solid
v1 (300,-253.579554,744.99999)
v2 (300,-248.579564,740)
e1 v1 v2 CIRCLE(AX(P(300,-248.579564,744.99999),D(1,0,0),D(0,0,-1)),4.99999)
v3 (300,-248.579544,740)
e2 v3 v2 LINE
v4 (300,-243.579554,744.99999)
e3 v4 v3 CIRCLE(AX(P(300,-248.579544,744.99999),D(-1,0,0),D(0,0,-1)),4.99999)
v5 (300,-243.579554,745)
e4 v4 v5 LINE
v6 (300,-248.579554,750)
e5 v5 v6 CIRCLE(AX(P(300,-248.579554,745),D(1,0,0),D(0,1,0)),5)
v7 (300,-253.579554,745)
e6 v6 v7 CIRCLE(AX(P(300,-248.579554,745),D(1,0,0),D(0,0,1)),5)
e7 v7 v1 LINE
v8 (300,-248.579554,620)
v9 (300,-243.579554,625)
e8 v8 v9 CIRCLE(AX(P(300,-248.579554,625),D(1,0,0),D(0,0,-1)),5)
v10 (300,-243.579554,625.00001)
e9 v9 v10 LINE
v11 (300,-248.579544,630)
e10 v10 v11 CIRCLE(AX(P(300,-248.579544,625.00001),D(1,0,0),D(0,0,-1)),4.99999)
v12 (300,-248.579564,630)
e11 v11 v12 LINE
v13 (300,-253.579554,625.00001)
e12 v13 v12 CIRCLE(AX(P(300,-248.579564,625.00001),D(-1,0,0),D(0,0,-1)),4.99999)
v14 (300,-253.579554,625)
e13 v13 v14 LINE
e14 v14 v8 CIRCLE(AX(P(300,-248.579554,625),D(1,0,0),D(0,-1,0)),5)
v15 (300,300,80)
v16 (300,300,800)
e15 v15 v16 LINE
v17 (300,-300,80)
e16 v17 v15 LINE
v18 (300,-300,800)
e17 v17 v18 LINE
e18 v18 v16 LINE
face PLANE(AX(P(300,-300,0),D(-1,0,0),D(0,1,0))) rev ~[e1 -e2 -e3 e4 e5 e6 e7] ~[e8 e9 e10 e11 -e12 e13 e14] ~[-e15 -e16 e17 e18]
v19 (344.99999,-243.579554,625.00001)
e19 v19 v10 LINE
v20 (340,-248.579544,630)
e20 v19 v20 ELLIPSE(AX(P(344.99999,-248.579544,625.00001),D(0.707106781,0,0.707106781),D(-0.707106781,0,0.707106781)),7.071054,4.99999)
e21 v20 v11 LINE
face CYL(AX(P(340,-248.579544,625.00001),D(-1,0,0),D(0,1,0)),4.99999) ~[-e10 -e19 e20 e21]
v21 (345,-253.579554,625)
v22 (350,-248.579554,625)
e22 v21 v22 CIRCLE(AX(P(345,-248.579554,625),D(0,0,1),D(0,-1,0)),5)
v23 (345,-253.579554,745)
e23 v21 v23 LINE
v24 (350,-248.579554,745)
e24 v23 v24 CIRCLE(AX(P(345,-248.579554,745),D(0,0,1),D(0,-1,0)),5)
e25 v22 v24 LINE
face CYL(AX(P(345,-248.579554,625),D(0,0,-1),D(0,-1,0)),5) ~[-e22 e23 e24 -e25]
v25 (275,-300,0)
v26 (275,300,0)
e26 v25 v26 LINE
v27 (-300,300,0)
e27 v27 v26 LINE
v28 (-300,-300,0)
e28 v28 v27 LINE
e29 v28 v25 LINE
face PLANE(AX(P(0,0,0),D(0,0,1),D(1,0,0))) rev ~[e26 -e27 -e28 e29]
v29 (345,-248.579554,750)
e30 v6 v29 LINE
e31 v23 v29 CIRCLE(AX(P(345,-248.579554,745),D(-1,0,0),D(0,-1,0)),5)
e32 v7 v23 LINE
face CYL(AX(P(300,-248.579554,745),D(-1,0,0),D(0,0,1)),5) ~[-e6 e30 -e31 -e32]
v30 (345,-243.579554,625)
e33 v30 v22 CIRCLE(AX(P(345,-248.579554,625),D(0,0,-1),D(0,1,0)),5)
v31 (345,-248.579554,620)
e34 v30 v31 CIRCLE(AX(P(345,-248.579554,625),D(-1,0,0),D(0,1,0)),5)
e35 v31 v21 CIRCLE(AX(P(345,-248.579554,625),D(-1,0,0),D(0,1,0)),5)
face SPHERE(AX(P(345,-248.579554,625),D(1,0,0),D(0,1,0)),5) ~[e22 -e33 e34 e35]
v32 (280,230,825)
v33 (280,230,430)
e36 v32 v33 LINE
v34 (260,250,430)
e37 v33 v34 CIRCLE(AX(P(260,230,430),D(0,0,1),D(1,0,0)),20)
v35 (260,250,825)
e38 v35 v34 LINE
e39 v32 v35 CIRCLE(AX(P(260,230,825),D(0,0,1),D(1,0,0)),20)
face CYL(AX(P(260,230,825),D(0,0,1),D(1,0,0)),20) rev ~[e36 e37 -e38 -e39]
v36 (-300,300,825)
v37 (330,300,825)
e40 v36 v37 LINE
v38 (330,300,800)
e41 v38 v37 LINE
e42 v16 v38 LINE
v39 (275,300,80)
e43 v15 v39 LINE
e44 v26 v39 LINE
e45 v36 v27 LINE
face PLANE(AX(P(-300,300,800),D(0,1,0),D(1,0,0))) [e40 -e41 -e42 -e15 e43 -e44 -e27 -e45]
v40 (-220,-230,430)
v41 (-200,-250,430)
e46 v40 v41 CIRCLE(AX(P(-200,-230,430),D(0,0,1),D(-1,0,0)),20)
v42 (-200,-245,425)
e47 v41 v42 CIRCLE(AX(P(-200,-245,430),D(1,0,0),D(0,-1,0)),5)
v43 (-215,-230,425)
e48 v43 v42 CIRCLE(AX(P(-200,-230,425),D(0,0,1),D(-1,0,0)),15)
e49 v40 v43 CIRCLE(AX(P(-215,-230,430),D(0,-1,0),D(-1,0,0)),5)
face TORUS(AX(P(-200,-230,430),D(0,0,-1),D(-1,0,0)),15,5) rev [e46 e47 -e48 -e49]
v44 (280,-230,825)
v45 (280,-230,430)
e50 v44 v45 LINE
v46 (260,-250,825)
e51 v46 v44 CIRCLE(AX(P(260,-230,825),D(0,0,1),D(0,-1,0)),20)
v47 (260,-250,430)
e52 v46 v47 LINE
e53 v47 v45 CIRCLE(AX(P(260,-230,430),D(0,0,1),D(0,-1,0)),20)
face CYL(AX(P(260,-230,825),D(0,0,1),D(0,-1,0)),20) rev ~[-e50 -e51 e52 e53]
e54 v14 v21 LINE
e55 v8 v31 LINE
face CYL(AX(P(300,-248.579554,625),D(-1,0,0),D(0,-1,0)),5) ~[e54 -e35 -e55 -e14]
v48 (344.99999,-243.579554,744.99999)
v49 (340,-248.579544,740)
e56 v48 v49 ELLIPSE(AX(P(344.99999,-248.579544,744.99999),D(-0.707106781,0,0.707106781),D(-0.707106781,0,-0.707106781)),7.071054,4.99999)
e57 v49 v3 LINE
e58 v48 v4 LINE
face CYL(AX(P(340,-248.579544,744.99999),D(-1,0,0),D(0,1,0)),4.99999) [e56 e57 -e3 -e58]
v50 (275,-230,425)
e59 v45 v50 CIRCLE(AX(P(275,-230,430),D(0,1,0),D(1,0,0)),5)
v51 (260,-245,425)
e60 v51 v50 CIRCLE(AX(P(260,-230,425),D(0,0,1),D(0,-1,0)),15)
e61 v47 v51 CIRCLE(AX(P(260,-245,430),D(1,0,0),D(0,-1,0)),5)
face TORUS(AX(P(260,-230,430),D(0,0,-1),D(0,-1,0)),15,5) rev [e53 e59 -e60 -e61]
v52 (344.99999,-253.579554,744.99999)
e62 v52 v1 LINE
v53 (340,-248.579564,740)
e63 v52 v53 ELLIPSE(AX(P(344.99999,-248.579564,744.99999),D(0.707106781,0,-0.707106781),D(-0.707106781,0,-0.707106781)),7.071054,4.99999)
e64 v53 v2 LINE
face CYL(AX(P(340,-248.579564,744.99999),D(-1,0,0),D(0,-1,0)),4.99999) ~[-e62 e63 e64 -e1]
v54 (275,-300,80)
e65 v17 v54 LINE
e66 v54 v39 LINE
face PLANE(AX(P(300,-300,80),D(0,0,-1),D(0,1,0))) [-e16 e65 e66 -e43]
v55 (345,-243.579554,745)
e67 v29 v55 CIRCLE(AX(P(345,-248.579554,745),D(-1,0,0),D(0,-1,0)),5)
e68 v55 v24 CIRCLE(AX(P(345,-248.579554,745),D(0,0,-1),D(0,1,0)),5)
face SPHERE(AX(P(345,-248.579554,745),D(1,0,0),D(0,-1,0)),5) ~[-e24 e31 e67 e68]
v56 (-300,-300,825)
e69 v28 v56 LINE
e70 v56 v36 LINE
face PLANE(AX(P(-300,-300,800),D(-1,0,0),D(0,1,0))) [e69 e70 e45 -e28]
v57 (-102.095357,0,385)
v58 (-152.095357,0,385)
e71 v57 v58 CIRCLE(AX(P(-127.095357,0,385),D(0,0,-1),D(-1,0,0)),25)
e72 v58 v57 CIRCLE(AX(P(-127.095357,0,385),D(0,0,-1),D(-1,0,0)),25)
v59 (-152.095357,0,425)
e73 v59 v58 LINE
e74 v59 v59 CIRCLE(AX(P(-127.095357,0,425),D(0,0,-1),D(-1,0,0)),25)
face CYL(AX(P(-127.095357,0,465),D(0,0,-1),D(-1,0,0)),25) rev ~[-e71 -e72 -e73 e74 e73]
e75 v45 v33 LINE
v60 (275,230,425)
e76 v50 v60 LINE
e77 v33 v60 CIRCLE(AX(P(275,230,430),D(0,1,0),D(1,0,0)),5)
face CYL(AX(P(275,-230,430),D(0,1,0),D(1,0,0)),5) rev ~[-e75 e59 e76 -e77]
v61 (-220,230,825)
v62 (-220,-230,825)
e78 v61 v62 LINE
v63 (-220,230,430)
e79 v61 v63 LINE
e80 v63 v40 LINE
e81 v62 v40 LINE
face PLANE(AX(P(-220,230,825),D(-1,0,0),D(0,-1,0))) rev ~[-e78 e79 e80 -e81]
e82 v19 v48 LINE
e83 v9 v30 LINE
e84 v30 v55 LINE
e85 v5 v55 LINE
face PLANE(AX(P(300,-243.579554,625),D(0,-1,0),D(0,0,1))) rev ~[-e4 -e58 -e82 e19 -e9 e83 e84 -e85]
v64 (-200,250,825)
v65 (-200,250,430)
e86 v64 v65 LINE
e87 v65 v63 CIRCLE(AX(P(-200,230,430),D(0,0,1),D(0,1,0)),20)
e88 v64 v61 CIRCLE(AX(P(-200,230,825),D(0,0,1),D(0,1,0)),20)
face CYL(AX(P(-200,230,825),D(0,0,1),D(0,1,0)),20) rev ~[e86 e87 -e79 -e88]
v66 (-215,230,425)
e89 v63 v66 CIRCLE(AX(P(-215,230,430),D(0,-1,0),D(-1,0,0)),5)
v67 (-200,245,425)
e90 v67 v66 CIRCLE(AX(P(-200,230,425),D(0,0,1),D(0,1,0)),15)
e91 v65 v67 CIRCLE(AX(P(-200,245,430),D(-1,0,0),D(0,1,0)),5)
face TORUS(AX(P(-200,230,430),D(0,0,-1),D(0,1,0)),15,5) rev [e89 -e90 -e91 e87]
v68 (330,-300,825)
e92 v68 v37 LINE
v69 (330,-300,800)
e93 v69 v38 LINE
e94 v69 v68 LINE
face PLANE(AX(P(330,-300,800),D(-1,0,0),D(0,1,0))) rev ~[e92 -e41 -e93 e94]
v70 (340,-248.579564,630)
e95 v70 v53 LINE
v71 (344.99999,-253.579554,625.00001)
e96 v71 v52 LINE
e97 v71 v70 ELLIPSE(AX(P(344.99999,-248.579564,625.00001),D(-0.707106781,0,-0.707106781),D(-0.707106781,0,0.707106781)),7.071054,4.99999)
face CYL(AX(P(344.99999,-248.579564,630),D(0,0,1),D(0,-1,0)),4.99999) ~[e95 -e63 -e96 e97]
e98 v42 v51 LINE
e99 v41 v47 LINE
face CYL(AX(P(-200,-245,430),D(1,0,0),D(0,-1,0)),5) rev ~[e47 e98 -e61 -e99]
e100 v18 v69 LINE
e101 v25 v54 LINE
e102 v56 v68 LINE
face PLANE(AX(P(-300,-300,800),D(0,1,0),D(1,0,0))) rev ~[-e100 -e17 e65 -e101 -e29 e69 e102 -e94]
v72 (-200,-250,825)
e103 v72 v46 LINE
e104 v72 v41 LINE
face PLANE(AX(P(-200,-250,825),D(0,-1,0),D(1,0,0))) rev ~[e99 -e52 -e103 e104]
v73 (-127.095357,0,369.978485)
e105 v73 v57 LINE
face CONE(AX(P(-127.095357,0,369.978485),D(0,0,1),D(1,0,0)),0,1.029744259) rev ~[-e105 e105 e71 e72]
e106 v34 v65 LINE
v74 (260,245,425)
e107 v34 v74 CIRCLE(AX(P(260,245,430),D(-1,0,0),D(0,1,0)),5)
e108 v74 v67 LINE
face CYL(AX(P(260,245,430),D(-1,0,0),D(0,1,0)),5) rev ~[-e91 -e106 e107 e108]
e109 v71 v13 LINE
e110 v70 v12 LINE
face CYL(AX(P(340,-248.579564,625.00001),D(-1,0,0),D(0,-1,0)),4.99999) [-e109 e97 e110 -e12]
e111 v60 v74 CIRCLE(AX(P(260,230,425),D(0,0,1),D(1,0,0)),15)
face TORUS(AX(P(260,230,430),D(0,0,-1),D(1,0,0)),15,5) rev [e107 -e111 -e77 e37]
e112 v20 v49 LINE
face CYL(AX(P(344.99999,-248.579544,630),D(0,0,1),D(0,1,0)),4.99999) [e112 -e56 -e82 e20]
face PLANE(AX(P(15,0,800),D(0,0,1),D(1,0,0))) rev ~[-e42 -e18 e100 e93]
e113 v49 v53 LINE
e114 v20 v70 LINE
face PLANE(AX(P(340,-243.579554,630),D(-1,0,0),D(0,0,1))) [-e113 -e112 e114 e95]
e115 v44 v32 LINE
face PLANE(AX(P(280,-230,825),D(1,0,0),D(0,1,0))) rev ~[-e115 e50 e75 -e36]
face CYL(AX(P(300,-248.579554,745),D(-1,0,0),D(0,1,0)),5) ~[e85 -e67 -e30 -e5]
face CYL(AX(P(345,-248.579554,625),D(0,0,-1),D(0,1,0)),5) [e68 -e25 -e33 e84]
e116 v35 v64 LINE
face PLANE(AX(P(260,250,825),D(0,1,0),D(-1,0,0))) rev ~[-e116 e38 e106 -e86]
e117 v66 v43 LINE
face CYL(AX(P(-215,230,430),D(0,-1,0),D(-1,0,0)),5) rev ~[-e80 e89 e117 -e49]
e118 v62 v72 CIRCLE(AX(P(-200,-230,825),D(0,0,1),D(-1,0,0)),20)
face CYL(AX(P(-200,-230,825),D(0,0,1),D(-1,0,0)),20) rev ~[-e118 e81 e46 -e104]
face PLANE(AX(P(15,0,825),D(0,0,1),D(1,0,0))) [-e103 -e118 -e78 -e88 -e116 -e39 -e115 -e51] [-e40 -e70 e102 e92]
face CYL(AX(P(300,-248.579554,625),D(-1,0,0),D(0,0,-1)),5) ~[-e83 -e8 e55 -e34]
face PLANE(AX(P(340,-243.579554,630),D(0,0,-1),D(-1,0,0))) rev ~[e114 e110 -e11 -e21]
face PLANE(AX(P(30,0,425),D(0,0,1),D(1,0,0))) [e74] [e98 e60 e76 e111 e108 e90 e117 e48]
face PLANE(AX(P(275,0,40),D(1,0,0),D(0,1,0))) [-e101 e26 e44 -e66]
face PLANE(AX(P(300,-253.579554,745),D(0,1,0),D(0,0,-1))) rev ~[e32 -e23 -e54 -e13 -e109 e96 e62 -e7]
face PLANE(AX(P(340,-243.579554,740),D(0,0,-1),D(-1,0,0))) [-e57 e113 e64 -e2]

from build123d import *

# Parameters (mm, degrees)
F0_W        = 600
F0_H        = 600
F1_DEPTH    = 800
F2_W        = 600
F2_H        = 80
F3_DEPTH    = 25
F5_DEPTH    = 50
F6_T1_DEPTH = 120
F6_T4_ANGLE = 180
F6_T6_ANGLE = 180
F7_W        = 40
F7_H        = 110
F8_DEPTH    = 25
F9_R        = 4.99999
F10_W       = 630
F10_H       = 600
F11_DEPTH   = 25
F13_DEPTH   = 400
F14_R       = 5
F16_D       = 50
F16_DEPTH   = 40
F16_TIP     = 15.0215154757


# Not quite as in the source:
# - a fillet or chamfer that OpenCascade refuses, or shapes differently, is made with other operations: its cross-section is extruded or revolved along the edge and cut away or added
# - a fillet or chamfer is up to 0.001 mm smaller than in the source, because OpenCascade refuses the exact size


with BuildPart() as f1:
    # F0 (on Top) → F1 (new body)
    with BuildSketch(Plane.XY):
        Rectangle(F0_W, F0_H)
    extrude(amount=F1_DEPTH)

    # F2 (on face) → F3 (cut)
    with BuildSketch(Plane.YZ.offset(300)):
        with Locations((0, 40)):
            Rectangle(F2_W, F2_H)
    extrude(amount=-F3_DEPTH, mode=Mode.SUBTRACT)

    # F4 (on face) → F5 (join)
    with BuildSketch(Plane.YZ.offset(300)):
        with BuildLine():
            ThreePointArc((-248.5795542598, 750), (-252.1150881657, 748.5355339059), (-253.5795542598, 745))
            Line((-253.5795542598, 745), (-253.5795542598, 625))
            ThreePointArc((-253.5795542598, 625), (-252.1150881657, 621.4644660941), (-248.5795542598, 620))
            ThreePointArc((-248.5795542598, 620), (-245.0440203538, 621.4644660941), (-243.5795542598, 625))
            Line((-243.5795542598, 625), (-243.5795542598, 745))
            ThreePointArc((-243.5795542598, 745), (-245.0440203538, 748.5355339059), (-248.5795542598, 750))
        make_face()
    extrude(amount=F5_DEPTH)

    # F6: fillet of radius 5 on 4 edges, made by hand

    # F6_s2 → F6_t1 (cut)
    with BuildSketch(Plane.XY.offset(625)):
        with BuildLine():
            ThreePointArc((345, -253.5795542598), (348.5355339059, -252.1150881657), (350, -248.5795542598))
            Line((350, -248.5795542598), (350, -253.5795542598))
            Line((350, -253.5795542598), (345, -253.5795542598))
        make_face()
        with BuildLine():
            ThreePointArc((345, -243.5795542598), (348.5355339059, -245.0440203538), (350, -248.5795542598))
            Line((350, -248.5795542598), (350, -243.5795542598))
            Line((350, -243.5795542598), (345, -243.5795542598))
        make_face()
    extrude(amount=F6_T1_DEPTH, mode=Mode.SUBTRACT)

    # F6_s3 → F6_t4 (revolve, cut)
    with BuildSketch(Plane.XY.offset(745)):
        with BuildLine():
            ThreePointArc((345, -253.5795542598), (348.5355339059, -252.1150881657), (350, -248.5795542598))
            Line((350, -248.5795542598), (350, -253.5795542598))
            Line((350, -253.5795542598), (345, -253.5795542598))
        make_face()
    revolve(axis=Axis((350, -248.5795542598, 745), (-1, 0, 0)), revolution_arc=F6_T4_ANGLE, mode=Mode.SUBTRACT)

    # F6_s5 → F6_t6 (revolve, cut)
    with BuildSketch(Plane.XY.offset(625)):
        with BuildLine():
            ThreePointArc((345, -243.5795542598), (348.5355339059, -245.0440203538), (350, -248.5795542598))
            Line((350, -248.5795542598), (350, -243.5795542598))
            Line((350, -243.5795542598), (345, -243.5795542598))
        make_face()
    revolve(axis=Axis((350, -248.5795542598, 625), (-1, 0, 0)), revolution_arc=F6_T6_ANGLE, mode=Mode.SUBTRACT)

    # F7 (on face) → F8 (cut)
    with BuildSketch(Plane(origin=(0, -243.5795542598, 0), x_dir=(-1, 0, 0), z_dir=(0, 1, 0))):
        with Locations((-320, 685)):
            Rectangle(F7_W, F7_H)
    extrude(amount=-F8_DEPTH, mode=Mode.SUBTRACT)

    # F9 (radius 5 in the source; OpenCascade refuses exactly that, so slightly less here)
    f9_edges = [f1.edges().sort_by_distance(p)[0] for p in [
        (320, -243.579554, 740),
        (340, -243.579554, 685),
        (320, -243.579554, 630),
        (320, -253.579554, 740),
        (340, -253.579554, 685),
        (320, -253.579554, 630),
    ]]
    fillet(f9_edges, radius=F9_R)

    # F10 (on face) → F11 (join)
    with BuildSketch(Plane.XY.offset(800)):
        with Locations((15, 0)):
            Rectangle(F10_W, F10_H)
    extrude(amount=F11_DEPTH)

    # F12 (on face) → F13 (cut)
    with BuildSketch(Plane.XY.offset(825)):
        with BuildLine():
            Line((-200, -250), (260, -250))
            ThreePointArc((260, -250), (274.1421356237, -244.1421356237), (280, -230))
            Line((280, -230), (280, 230))
            ThreePointArc((280, 230), (274.1421356237, 244.1421356237), (260, 250))
            Line((260, 250), (-200, 250))
            ThreePointArc((-200, 250), (-214.1421356237, 244.1421356237), (-220, 230))
            Line((-220, 230), (-220, -230))
            ThreePointArc((-220, -230), (-214.1421356237, -244.1421356237), (-200, -250))
        make_face()
    extrude(amount=-F13_DEPTH, mode=Mode.SUBTRACT)

    # F14
    f14_edges = [f1.edges().sort_by_distance(p)[0] for p in [
        (30, 250, 425),
        (-214.142136, 244.142136, 425),
        (-220, 0, 425),
        (30, -250, 425),
        (274.142136, -244.142136, 425),
        (280, 0, 425),
        (274.142136, 244.142136, 425),
        (-214.142136, -244.142136, 425),
    ]]
    fillet(f14_edges, radius=F14_R)

    # F16
    with Locations(Plane.XY.offset(425)):
        with Locations((-127.0953565836, 0)):
            Hole(F16_D / 2, depth=F16_DEPTH)
            with Locations((0, 0, -(F16_DEPTH + F16_TIP / 2))):  # 118° drill point
                Cone(0, F16_D / 2, F16_TIP, mode=Mode.SUBTRACT)


solid = f1.part
